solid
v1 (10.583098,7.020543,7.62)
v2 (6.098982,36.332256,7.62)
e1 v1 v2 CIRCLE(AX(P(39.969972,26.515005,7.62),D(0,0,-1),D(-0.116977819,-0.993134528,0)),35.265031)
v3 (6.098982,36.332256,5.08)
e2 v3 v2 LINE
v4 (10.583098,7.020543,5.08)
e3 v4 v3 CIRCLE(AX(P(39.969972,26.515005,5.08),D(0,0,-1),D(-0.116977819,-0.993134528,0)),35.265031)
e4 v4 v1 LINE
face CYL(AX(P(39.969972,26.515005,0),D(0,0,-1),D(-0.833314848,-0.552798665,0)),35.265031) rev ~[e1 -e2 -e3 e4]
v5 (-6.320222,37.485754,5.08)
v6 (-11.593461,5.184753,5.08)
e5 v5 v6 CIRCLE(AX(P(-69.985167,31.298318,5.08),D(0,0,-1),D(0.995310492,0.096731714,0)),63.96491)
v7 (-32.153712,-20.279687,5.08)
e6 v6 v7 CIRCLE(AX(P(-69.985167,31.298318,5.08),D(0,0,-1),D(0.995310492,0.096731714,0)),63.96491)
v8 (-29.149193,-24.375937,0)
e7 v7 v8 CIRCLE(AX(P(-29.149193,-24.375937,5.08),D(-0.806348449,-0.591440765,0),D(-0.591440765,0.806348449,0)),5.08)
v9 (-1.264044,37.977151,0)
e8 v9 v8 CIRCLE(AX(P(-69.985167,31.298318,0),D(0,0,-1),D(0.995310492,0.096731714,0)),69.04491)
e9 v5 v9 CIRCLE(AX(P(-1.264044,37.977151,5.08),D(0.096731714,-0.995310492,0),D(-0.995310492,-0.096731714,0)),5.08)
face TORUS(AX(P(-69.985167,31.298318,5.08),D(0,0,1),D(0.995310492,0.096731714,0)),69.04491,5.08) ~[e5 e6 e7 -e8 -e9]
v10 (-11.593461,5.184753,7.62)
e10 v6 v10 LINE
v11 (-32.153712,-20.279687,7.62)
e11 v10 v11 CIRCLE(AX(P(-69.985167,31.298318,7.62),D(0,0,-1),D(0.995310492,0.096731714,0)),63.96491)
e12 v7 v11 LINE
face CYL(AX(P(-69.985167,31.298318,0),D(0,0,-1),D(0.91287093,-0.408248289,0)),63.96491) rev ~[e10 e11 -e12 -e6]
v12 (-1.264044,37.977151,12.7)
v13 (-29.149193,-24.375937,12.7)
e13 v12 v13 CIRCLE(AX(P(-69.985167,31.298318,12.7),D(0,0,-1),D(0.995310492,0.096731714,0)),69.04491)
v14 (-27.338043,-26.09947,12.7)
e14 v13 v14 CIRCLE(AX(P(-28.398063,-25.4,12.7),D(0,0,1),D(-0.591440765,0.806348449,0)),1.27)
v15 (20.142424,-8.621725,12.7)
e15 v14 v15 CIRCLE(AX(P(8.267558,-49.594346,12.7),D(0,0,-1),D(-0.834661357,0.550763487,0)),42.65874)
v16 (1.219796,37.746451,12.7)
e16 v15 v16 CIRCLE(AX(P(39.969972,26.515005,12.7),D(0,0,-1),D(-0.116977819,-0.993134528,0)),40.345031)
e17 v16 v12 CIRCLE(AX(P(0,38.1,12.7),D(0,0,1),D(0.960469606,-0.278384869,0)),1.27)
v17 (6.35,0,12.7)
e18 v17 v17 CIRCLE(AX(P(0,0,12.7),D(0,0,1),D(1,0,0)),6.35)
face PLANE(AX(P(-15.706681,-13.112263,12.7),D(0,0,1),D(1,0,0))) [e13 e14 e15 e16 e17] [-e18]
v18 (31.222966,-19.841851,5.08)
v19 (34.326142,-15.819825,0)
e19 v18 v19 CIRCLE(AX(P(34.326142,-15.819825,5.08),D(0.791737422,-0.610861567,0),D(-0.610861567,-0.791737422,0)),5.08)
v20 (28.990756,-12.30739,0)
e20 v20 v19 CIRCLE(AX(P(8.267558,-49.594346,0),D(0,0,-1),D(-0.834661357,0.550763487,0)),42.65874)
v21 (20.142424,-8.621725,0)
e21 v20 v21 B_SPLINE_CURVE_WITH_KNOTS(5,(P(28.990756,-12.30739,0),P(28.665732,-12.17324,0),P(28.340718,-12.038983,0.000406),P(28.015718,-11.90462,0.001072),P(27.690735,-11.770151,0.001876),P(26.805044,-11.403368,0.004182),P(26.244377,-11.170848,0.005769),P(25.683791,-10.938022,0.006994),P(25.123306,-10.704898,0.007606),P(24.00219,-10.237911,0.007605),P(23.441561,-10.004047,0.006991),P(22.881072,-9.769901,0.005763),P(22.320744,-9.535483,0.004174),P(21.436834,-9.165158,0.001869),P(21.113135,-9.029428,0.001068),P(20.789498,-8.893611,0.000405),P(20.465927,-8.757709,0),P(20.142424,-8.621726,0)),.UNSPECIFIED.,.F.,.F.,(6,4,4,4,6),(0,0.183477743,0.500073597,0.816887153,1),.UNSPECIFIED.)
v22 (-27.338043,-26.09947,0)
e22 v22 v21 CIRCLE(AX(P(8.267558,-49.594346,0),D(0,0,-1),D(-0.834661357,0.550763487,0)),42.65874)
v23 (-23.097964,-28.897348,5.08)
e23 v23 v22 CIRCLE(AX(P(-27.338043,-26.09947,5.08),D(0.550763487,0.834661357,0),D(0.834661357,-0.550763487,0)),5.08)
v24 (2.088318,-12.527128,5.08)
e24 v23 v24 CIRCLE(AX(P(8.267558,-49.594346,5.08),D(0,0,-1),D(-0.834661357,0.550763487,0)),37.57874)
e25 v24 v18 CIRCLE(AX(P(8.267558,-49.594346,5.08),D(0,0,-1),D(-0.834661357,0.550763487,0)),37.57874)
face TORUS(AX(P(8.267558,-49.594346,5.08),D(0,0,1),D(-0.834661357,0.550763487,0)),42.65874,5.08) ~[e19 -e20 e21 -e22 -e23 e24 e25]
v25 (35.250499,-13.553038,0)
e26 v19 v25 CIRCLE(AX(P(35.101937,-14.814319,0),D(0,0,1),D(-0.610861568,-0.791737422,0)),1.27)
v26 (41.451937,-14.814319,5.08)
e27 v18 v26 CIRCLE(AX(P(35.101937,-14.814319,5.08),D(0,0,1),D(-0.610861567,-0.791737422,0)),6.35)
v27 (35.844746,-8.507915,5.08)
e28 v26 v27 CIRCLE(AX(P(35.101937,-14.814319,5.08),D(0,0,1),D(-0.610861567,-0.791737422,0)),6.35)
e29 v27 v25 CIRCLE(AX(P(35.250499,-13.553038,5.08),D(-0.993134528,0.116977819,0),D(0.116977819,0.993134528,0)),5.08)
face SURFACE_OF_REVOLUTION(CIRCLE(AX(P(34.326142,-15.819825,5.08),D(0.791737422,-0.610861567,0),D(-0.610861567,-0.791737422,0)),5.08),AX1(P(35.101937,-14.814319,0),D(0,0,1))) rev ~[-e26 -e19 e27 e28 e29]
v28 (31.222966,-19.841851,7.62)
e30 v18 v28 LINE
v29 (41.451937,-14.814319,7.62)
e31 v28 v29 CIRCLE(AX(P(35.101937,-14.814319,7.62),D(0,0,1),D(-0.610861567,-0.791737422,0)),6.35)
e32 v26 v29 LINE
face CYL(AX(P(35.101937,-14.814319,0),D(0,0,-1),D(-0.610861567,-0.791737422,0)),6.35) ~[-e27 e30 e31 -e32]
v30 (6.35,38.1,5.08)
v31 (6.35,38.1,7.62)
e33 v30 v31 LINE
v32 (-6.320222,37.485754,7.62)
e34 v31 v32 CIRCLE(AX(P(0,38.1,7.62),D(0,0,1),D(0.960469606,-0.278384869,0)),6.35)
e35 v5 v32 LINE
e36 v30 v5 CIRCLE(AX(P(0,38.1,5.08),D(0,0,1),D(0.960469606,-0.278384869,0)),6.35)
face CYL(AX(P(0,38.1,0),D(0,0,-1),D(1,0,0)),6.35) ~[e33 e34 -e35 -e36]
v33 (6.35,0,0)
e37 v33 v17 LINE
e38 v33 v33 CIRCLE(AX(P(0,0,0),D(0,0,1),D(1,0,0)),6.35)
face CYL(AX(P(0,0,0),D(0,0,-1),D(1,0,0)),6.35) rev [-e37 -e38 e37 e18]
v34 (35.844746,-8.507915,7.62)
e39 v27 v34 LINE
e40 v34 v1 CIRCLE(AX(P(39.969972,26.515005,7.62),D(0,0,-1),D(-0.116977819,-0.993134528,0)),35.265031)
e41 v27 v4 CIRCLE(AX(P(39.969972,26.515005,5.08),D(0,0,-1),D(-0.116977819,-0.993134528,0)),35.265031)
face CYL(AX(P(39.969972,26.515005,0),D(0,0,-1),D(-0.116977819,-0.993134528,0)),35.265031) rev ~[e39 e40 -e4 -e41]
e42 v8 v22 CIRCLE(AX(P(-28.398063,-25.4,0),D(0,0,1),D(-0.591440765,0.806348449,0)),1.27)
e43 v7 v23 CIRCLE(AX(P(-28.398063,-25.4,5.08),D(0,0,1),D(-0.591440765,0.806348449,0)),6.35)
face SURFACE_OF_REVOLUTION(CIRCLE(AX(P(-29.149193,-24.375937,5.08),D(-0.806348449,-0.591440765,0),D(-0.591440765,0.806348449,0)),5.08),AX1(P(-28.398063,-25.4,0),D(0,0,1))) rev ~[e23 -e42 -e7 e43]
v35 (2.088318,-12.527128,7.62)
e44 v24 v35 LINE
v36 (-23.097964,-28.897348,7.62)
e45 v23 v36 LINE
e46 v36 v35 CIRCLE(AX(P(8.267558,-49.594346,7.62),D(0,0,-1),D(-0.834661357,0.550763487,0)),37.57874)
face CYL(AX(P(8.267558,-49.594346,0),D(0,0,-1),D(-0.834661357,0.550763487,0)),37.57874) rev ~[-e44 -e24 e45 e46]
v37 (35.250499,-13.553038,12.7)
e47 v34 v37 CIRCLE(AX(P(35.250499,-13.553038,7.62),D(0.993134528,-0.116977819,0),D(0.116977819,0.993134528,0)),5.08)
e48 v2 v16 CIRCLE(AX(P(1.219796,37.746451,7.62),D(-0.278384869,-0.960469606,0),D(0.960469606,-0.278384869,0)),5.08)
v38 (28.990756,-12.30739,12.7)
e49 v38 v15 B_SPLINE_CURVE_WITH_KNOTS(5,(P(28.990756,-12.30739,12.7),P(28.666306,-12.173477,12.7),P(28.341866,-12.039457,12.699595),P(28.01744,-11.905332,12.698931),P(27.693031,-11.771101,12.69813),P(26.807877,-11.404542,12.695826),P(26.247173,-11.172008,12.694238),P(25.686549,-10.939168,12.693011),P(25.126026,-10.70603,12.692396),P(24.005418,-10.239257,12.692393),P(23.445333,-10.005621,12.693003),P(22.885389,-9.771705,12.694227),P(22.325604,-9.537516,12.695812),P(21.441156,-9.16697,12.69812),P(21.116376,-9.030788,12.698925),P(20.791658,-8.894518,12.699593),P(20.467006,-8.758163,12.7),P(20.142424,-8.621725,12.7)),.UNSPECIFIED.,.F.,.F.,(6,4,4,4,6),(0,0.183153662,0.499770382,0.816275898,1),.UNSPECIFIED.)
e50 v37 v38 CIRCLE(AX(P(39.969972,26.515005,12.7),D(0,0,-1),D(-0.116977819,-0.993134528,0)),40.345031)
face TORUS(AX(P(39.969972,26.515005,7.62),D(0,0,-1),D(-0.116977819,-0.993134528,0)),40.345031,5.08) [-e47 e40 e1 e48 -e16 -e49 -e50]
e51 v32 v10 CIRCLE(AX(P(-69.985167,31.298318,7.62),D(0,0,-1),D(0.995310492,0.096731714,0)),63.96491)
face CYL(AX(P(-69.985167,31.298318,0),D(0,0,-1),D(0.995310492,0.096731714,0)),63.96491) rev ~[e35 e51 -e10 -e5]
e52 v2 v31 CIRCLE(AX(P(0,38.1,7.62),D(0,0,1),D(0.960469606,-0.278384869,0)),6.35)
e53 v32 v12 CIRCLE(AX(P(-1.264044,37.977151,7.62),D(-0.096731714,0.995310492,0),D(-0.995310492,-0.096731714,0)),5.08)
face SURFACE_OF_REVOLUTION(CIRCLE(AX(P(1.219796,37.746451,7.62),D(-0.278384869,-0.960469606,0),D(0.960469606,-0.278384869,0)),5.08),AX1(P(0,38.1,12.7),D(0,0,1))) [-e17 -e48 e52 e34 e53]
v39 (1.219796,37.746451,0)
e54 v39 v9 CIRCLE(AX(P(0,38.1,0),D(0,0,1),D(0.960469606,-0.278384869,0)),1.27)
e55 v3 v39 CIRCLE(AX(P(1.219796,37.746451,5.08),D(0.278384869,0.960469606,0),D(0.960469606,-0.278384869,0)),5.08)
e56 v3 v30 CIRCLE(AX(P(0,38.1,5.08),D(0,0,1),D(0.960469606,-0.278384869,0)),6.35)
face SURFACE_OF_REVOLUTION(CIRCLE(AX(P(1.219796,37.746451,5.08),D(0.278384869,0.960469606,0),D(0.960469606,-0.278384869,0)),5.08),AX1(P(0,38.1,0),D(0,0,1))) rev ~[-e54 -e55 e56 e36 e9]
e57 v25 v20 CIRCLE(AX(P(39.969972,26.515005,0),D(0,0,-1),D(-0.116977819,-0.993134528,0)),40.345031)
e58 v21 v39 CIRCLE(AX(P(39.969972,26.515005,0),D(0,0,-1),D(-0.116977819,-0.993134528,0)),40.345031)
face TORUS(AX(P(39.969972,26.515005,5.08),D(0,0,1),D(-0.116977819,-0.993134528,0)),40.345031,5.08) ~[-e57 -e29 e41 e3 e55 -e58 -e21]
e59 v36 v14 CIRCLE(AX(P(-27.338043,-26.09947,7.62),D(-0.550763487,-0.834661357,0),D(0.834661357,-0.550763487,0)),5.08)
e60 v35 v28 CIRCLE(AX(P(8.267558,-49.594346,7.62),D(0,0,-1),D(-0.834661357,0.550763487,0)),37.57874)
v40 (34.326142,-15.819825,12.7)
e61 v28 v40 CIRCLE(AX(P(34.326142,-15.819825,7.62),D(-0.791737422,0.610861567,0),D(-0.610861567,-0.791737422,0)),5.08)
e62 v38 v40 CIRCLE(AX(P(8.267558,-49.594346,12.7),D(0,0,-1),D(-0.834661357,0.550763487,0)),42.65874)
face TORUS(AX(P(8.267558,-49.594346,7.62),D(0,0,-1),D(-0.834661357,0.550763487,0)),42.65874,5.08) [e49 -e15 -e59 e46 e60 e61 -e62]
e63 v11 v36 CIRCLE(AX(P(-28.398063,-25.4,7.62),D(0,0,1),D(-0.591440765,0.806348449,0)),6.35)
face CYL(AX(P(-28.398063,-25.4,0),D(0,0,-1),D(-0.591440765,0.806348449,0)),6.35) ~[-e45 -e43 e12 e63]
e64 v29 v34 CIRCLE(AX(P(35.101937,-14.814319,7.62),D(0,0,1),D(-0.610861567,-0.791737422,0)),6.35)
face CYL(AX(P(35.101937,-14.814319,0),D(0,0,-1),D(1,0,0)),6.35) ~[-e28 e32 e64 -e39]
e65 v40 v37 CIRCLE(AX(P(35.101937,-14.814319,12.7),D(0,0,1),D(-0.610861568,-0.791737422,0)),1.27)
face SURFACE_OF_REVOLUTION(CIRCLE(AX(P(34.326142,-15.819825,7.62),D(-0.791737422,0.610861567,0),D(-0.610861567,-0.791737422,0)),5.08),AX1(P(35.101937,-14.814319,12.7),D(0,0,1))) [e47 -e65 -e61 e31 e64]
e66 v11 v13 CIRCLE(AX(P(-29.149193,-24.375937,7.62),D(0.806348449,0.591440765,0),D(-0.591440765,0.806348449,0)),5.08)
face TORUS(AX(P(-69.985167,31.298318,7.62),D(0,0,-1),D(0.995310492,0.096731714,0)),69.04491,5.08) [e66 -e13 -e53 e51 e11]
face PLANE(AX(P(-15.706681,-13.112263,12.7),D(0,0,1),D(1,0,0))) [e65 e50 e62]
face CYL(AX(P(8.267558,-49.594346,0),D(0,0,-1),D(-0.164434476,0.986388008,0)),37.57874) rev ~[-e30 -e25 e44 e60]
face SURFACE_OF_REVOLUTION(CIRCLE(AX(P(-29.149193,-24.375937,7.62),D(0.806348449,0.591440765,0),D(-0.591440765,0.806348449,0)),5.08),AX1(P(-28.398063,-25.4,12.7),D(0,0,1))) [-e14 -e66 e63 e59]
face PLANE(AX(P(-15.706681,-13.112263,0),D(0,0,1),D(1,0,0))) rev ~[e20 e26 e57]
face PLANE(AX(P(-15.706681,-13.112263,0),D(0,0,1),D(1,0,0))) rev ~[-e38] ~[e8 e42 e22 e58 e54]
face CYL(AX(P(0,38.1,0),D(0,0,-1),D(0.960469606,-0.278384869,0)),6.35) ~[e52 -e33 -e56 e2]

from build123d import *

# Parameters (mm, degrees)
F0_R         = 6.35
F1_DEPTH     = 12.7
F2_T2_ANGLE  = 99.446116479
F2_T4_ANGLE  = 59.2916827944
F2_T6_ANGLE  = 201.7148311049
F2_T8_ANGLE  = 200.3212768017
F2_T10_ANGLE = 94.2324188496
F2_T12_ANGLE = 210.9341102164
F2_T14_ANGLE = 94.2324188496
F2_T16_ANGLE = 210.9341102164
F2_T18_ANGLE = 200.3212768017
F2_T20_ANGLE = 59.2916827944
F2_T22_ANGLE = 201.7148311049
F2_T24_ANGLE = 99.446116479


# Not quite as in the source:
# - a fillet or chamfer that OpenCascade refuses, or shapes differently, is made with other operations: its cross-section is extruded or revolved along the edge and cut away or added


with BuildPart() as f1:
    # F0 (on Top) → F1 (new body)
    with BuildSketch(Plane.XY):
        with BuildLine():
            ThreePointArc((-23.0979636954, -28.8973481426), (-12.2116587197, -18.0861984821), (2.0883176929, -12.527127732))
            ThreePointArc((2.0883176929, -12.527127732), (-10.0506029407, -7.7637220795), (-11.5934607492, 5.1847534038))
            ThreePointArc((-11.5934607492, 5.1847534038), (-20.2173700121, -8.8847131705), (-32.1537121721, -20.2796873478))
            ThreePointArc((-32.1537121721, -20.2796873478), (-25.5280345903, -19.7355993147), (-22.0480633142, -25.4))
            ThreePointArc((-22.0480633142, -25.4), (-22.3161995958, -27.2257693475), (-23.0979636954, -28.8973481426))
        make_face()
        with BuildLine():
            ThreePointArc((10.5830984733, 7.0205431916), (12.1592629425, 3.6663775985), (12.7, 0))
            ThreePointArc((12.7, 0), (9.6905013983, -8.2087869171), (2.0883176929, -12.527127732))
            ThreePointArc((2.0883176929, -12.527127732), (17.4183090092, -13.1467749254), (31.2229657331, -19.8418514101))
            ThreePointArc((31.2229657331, -19.8418514101), (29.2220209534, -12.4165925694), (35.8447458338, -8.5079145294))
            ThreePointArc((35.8447458338, -8.5079145294), (21.5024747262, -3.5278630909), (10.5830984733, 7.0205431916))
        make_face()
        with BuildLine():
            ThreePointArc((-11.5934607492, 5.1847534038), (-1.0477304131, 12.6567081416), (10.5830984733, 7.0205431916))
            ThreePointArc((10.5830984733, 7.0205431916), (5.1104904876, 21.1821889646), (6.0989820006, 36.3322560831))
            ThreePointArc((6.0989820006, 36.3322560831), (-0.5872613397, 31.7772138958), (-6.320221624, 37.4857536138))
            ThreePointArc((-6.320221624, 37.4857536138), (-6.8559724512, 20.992280129), (-11.5934607492, 5.1847534038))
        make_face()
        with BuildLine():
            ThreePointArc((2.0883176929, -12.527127732), (9.6905013983, -8.2087869171), (12.7, 0))
            ThreePointArc((12.7, 0), (12.1592629425, 3.6663775985), (10.5830984733, 7.0205431916))
            ThreePointArc((10.5830984733, 7.0205431916), (-1.0477304131, 12.6567081416), (-11.5934607492, 5.1847534038))
            ThreePointArc((-11.5934607492, 5.1847534038), (-10.0506029407, -7.7637220795), (2.0883176929, -12.527127732))
        make_face()
        Circle(F0_R, mode=Mode.SUBTRACT)
        with BuildLine():
            ThreePointArc((-32.1537121721, -20.2796873478), (-32.7755456308, -30.0000161487), (-23.0979636954, -28.8973481426))
            ThreePointArc((-23.0979636954, -28.8973481426), (-22.3161995958, -27.2257693475), (-22.0480633142, -25.4))
            ThreePointArc((-22.0480633142, -25.4), (-25.5280345903, -19.7355993147), (-32.1537121721, -20.2796873478))
        make_face()
        with BuildLine():
            ThreePointArc((41.4519366858, -14.8143187798), (39.8474260225, -10.5949786709), (35.8447458338, -8.5079145294))
            ThreePointArc((35.8447458338, -8.5079145294), (29.2220209534, -12.4165925694), (31.2229657331, -19.8418514101))
            ThreePointArc((31.2229657331, -19.8418514101), (37.9029217313, -20.5131768035), (41.4519366858, -14.8143187798))
        make_face()
        with BuildLine():
            ThreePointArc((-6.320221624, 37.4857536138), (-0.5872613397, 31.7772138958), (6.0989820006, 36.3322560831))
            ThreePointArc((6.0989820006, 36.3322560831), (6.2869323085, 37.2072614336), (6.35, 38.1))
            ThreePointArc((6.35, 38.1), (-0.3074838917, 44.442551037), (-6.320221624, 37.4857536138))
        make_face()
    extrude(amount=F1_DEPTH)

    # F2: fillet of radius 5.08 on 12 edges, made by hand

    # F2_s1 → F2_t2 (revolve, cut)
    with BuildSketch(Plane(origin=(36.3426576492, -4.2806736606, 0), x_dir=(0, 0, 1), z_dir=(0.9931345276, -0.1169778186, 0))):
        with BuildLine():
            ThreePointArc((7.62, 4.2564635014), (11.2121024484, 5.744361053), (12.7, 9.3364635014))
            Line((12.7, 9.3364635014), (12.7, 4.2564635014))
            Line((12.7, 4.2564635014), (7.62, 4.2564635014))
        make_face()
    revolve(axis=Axis((39.9699722036, 26.5150051248, 12.7), (0, 0, -1)), revolution_arc=F2_T2_ANGLE, mode=Mode.SUBTRACT)

    # F2_s3 → F2_t4 (revolve, cut)
    with BuildSketch(Plane(origin=(-3.6681952371, 37.7434973641, 0), x_dir=(0, 0, 1), z_dir=(-0.0967317144, 0.995310492, 0))):
        with BuildLine():
            ThreePointArc((7.62, -2.6645216828), (11.2121024484, -1.1766241312), (12.7, 2.4154783172))
            Line((12.7, 2.4154783172), (12.7, -2.6645216828))
            Line((12.7, -2.6645216828), (7.62, -2.6645216828))
        make_face()
    revolve(axis=Axis((-69.9851672009, 31.2983182556, 12.7), (0, 0, -1)), revolution_arc=F2_T4_ANGLE, mode=Mode.SUBTRACT)

    # F2_s5 → F2_t6 (revolve, cut)
    with BuildSketch(Plane(origin=(10.1871858245, 35.1473210497, 0), x_dir=(0, 0, 1), z_dir=(-0.2783848688, -0.9604696064, 0))):
        with BuildLine():
            ThreePointArc((7.62, 4.2564635014), (11.2121024484, 5.744361053), (12.7, 9.3364635014))
            Line((12.7, 9.3364635014), (12.7, 4.2564635014))
            Line((12.7, 4.2564635014), (7.62, 4.2564635014))
        make_face()
    revolve(axis=Axis((0, 38.1, 12.7), (0, 0, 1)), revolution_arc=F2_T6_ANGLE, mode=Mode.SUBTRACT)

    # F2_s7 → F2_t8 (revolve, cut)
    with BuildSketch(Plane(origin=(-30.5778054296, -22.4282202745, 0), x_dir=(0, 0, 1), z_dir=(0.8063484492, 0.591440765, 0))):
        with BuildLine():
            ThreePointArc((7.62, -2.6645216828), (11.2121024484, -1.1766241312), (12.7, 2.4154783172))
            Line((12.7, 2.4154783172), (12.7, -2.6645216828))
            Line((12.7, -2.6645216828), (7.62, -2.6645216828))
        make_face()
    revolve(axis=Axis((-28.3980633142, -25.4, 12.7), (0, 0, 1)), revolution_arc=F2_T8_ANGLE, mode=Mode.SUBTRACT)

    # F2_s9 → F2_t10 (revolve, cut)
    with BuildSketch(Plane(origin=(-20.2906858047, -30.7497714597, 0), x_dir=(0, 0, 1), z_dir=(-0.550763487, -0.8346613573, 0))):
        with BuildLine():
            ThreePointArc((5.08, 3.3633735001), (1.4878975516, 4.8512710517), (0, 8.4433735001))
            Line((0, 8.4433735001), (0, 3.3633735001))
            Line((0, 3.3633735001), (5.08, 3.3633735001))
        make_face()
    revolve(axis=Axis((8.2675580223, -49.5943457482, 0), (0, 0, -1)), revolution_arc=F2_T10_ANGLE, mode=Mode.SUBTRACT)

    # F2_s11 → F2_t12 (revolve, cut)
    with BuildSketch(Plane(origin=(29.1684101252, -22.5047600746, 0), x_dir=(0, 0, 1), z_dir=(-0.7917374221, 0.6108615673, 0))):
        with BuildLine():
            ThreePointArc((5.08, 3.3633735001), (1.4878975516, 4.8512710517), (0, 8.4433735001))
            Line((0, 8.4433735001), (0, 3.3633735001))
            Line((0, 3.3633735001), (5.08, 3.3633735001))
        make_face()
    revolve(axis=Axis((35.1019366858, -14.8143187798, 0), (0, 0, 1)), revolution_arc=F2_T12_ANGLE, mode=Mode.SUBTRACT)

    # F2_s13 → F2_t14 (revolve, cut)
    with BuildSketch(Plane(origin=(-20.2906858047, -30.7497714597, 0), x_dir=(0, 0, 1), z_dir=(-0.550763487, -0.8346613573, 0))):
        with BuildLine():
            ThreePointArc((7.62, 3.3633735001), (11.2121024484, 4.8512710517), (12.7, 8.4433735001))
            Line((12.7, 8.4433735001), (12.7, 3.3633735001))
            Line((12.7, 3.3633735001), (7.62, 3.3633735001))
        make_face()
    revolve(axis=Axis((8.2675580223, -49.5943457482, 12.7), (0, 0, -1)), revolution_arc=F2_T14_ANGLE, mode=Mode.SUBTRACT)

    # F2_s15 → F2_t16 (revolve, cut)
    with BuildSketch(Plane(origin=(29.1684101252, -22.5047600746, 0), x_dir=(0, 0, 1), z_dir=(-0.7917374221, 0.6108615673, 0))):
        with BuildLine():
            ThreePointArc((7.62, 3.3633735001), (11.2121024484, 4.8512710517), (12.7, 8.4433735001))
            Line((12.7, 8.4433735001), (12.7, 3.3633735001))
            Line((12.7, 3.3633735001), (7.62, 3.3633735001))
        make_face()
    revolve(axis=Axis((35.1019366858, -14.8143187798, 12.7), (0, 0, 1)), revolution_arc=F2_T16_ANGLE, mode=Mode.SUBTRACT)

    # F2_s17 → F2_t18 (revolve, cut)
    with BuildSketch(Plane(origin=(-30.5778054296, -22.4282202745, 0), x_dir=(0, 0, 1), z_dir=(0.8063484492, 0.591440765, 0))):
        with BuildLine():
            ThreePointArc((5.08, -2.6645216828), (1.4878975516, -1.1766241312), (0, 2.4154783172))
            Line((0, 2.4154783172), (0, -2.6645216828))
            Line((0, -2.6645216828), (5.08, -2.6645216828))
        make_face()
    revolve(axis=Axis((-28.3980633142, -25.4, 0), (0, 0, 1)), revolution_arc=F2_T18_ANGLE, mode=Mode.SUBTRACT)

    # F2_s19 → F2_t20 (revolve, cut)
    with BuildSketch(Plane(origin=(-3.6681952371, 37.7434973641, 0), x_dir=(0, 0, 1), z_dir=(-0.0967317144, 0.995310492, 0))):
        with BuildLine():
            ThreePointArc((5.08, -2.6645216828), (1.4878975516, -1.1766241312), (0, 2.4154783172))
            Line((0, 2.4154783172), (0, -2.6645216828))
            Line((0, -2.6645216828), (5.08, -2.6645216828))
        make_face()
    revolve(axis=Axis((-69.9851672009, 31.2983182556, 0), (0, 0, -1)), revolution_arc=F2_T20_ANGLE, mode=Mode.SUBTRACT)

    # F2_s21 → F2_t22 (revolve, cut)
    with BuildSketch(Plane(origin=(10.1871858245, 35.1473210497, 0), x_dir=(0, 0, 1), z_dir=(-0.2783848688, -0.9604696064, 0))):
        with BuildLine():
            ThreePointArc((5.08, 4.2564635014), (1.4878975516, 5.744361053), (0, 9.3364635014))
            Line((0, 9.3364635014), (0, 4.2564635014))
            Line((0, 4.2564635014), (5.08, 4.2564635014))
        make_face()
    revolve(axis=Axis((0, 38.1, 0), (0, 0, 1)), revolution_arc=F2_T22_ANGLE, mode=Mode.SUBTRACT)

    # F2_s23 → F2_t24 (revolve, cut)
    with BuildSketch(Plane(origin=(36.3426576492, -4.2806736606, 0), x_dir=(0, 0, 1), z_dir=(0.9931345276, -0.1169778186, 0))):
        with BuildLine():
            ThreePointArc((5.08, 4.2564635014), (1.4878975516, 5.744361053), (0, 9.3364635014))
            Line((0, 9.3364635014), (0, 4.2564635014))
            Line((0, 4.2564635014), (5.08, 4.2564635014))
        make_face()
    revolve(axis=Axis((39.9699722036, 26.5150051248, 0), (0, 0, -1)), revolution_arc=F2_T24_ANGLE, mode=Mode.SUBTRACT)


solid = f1.part
